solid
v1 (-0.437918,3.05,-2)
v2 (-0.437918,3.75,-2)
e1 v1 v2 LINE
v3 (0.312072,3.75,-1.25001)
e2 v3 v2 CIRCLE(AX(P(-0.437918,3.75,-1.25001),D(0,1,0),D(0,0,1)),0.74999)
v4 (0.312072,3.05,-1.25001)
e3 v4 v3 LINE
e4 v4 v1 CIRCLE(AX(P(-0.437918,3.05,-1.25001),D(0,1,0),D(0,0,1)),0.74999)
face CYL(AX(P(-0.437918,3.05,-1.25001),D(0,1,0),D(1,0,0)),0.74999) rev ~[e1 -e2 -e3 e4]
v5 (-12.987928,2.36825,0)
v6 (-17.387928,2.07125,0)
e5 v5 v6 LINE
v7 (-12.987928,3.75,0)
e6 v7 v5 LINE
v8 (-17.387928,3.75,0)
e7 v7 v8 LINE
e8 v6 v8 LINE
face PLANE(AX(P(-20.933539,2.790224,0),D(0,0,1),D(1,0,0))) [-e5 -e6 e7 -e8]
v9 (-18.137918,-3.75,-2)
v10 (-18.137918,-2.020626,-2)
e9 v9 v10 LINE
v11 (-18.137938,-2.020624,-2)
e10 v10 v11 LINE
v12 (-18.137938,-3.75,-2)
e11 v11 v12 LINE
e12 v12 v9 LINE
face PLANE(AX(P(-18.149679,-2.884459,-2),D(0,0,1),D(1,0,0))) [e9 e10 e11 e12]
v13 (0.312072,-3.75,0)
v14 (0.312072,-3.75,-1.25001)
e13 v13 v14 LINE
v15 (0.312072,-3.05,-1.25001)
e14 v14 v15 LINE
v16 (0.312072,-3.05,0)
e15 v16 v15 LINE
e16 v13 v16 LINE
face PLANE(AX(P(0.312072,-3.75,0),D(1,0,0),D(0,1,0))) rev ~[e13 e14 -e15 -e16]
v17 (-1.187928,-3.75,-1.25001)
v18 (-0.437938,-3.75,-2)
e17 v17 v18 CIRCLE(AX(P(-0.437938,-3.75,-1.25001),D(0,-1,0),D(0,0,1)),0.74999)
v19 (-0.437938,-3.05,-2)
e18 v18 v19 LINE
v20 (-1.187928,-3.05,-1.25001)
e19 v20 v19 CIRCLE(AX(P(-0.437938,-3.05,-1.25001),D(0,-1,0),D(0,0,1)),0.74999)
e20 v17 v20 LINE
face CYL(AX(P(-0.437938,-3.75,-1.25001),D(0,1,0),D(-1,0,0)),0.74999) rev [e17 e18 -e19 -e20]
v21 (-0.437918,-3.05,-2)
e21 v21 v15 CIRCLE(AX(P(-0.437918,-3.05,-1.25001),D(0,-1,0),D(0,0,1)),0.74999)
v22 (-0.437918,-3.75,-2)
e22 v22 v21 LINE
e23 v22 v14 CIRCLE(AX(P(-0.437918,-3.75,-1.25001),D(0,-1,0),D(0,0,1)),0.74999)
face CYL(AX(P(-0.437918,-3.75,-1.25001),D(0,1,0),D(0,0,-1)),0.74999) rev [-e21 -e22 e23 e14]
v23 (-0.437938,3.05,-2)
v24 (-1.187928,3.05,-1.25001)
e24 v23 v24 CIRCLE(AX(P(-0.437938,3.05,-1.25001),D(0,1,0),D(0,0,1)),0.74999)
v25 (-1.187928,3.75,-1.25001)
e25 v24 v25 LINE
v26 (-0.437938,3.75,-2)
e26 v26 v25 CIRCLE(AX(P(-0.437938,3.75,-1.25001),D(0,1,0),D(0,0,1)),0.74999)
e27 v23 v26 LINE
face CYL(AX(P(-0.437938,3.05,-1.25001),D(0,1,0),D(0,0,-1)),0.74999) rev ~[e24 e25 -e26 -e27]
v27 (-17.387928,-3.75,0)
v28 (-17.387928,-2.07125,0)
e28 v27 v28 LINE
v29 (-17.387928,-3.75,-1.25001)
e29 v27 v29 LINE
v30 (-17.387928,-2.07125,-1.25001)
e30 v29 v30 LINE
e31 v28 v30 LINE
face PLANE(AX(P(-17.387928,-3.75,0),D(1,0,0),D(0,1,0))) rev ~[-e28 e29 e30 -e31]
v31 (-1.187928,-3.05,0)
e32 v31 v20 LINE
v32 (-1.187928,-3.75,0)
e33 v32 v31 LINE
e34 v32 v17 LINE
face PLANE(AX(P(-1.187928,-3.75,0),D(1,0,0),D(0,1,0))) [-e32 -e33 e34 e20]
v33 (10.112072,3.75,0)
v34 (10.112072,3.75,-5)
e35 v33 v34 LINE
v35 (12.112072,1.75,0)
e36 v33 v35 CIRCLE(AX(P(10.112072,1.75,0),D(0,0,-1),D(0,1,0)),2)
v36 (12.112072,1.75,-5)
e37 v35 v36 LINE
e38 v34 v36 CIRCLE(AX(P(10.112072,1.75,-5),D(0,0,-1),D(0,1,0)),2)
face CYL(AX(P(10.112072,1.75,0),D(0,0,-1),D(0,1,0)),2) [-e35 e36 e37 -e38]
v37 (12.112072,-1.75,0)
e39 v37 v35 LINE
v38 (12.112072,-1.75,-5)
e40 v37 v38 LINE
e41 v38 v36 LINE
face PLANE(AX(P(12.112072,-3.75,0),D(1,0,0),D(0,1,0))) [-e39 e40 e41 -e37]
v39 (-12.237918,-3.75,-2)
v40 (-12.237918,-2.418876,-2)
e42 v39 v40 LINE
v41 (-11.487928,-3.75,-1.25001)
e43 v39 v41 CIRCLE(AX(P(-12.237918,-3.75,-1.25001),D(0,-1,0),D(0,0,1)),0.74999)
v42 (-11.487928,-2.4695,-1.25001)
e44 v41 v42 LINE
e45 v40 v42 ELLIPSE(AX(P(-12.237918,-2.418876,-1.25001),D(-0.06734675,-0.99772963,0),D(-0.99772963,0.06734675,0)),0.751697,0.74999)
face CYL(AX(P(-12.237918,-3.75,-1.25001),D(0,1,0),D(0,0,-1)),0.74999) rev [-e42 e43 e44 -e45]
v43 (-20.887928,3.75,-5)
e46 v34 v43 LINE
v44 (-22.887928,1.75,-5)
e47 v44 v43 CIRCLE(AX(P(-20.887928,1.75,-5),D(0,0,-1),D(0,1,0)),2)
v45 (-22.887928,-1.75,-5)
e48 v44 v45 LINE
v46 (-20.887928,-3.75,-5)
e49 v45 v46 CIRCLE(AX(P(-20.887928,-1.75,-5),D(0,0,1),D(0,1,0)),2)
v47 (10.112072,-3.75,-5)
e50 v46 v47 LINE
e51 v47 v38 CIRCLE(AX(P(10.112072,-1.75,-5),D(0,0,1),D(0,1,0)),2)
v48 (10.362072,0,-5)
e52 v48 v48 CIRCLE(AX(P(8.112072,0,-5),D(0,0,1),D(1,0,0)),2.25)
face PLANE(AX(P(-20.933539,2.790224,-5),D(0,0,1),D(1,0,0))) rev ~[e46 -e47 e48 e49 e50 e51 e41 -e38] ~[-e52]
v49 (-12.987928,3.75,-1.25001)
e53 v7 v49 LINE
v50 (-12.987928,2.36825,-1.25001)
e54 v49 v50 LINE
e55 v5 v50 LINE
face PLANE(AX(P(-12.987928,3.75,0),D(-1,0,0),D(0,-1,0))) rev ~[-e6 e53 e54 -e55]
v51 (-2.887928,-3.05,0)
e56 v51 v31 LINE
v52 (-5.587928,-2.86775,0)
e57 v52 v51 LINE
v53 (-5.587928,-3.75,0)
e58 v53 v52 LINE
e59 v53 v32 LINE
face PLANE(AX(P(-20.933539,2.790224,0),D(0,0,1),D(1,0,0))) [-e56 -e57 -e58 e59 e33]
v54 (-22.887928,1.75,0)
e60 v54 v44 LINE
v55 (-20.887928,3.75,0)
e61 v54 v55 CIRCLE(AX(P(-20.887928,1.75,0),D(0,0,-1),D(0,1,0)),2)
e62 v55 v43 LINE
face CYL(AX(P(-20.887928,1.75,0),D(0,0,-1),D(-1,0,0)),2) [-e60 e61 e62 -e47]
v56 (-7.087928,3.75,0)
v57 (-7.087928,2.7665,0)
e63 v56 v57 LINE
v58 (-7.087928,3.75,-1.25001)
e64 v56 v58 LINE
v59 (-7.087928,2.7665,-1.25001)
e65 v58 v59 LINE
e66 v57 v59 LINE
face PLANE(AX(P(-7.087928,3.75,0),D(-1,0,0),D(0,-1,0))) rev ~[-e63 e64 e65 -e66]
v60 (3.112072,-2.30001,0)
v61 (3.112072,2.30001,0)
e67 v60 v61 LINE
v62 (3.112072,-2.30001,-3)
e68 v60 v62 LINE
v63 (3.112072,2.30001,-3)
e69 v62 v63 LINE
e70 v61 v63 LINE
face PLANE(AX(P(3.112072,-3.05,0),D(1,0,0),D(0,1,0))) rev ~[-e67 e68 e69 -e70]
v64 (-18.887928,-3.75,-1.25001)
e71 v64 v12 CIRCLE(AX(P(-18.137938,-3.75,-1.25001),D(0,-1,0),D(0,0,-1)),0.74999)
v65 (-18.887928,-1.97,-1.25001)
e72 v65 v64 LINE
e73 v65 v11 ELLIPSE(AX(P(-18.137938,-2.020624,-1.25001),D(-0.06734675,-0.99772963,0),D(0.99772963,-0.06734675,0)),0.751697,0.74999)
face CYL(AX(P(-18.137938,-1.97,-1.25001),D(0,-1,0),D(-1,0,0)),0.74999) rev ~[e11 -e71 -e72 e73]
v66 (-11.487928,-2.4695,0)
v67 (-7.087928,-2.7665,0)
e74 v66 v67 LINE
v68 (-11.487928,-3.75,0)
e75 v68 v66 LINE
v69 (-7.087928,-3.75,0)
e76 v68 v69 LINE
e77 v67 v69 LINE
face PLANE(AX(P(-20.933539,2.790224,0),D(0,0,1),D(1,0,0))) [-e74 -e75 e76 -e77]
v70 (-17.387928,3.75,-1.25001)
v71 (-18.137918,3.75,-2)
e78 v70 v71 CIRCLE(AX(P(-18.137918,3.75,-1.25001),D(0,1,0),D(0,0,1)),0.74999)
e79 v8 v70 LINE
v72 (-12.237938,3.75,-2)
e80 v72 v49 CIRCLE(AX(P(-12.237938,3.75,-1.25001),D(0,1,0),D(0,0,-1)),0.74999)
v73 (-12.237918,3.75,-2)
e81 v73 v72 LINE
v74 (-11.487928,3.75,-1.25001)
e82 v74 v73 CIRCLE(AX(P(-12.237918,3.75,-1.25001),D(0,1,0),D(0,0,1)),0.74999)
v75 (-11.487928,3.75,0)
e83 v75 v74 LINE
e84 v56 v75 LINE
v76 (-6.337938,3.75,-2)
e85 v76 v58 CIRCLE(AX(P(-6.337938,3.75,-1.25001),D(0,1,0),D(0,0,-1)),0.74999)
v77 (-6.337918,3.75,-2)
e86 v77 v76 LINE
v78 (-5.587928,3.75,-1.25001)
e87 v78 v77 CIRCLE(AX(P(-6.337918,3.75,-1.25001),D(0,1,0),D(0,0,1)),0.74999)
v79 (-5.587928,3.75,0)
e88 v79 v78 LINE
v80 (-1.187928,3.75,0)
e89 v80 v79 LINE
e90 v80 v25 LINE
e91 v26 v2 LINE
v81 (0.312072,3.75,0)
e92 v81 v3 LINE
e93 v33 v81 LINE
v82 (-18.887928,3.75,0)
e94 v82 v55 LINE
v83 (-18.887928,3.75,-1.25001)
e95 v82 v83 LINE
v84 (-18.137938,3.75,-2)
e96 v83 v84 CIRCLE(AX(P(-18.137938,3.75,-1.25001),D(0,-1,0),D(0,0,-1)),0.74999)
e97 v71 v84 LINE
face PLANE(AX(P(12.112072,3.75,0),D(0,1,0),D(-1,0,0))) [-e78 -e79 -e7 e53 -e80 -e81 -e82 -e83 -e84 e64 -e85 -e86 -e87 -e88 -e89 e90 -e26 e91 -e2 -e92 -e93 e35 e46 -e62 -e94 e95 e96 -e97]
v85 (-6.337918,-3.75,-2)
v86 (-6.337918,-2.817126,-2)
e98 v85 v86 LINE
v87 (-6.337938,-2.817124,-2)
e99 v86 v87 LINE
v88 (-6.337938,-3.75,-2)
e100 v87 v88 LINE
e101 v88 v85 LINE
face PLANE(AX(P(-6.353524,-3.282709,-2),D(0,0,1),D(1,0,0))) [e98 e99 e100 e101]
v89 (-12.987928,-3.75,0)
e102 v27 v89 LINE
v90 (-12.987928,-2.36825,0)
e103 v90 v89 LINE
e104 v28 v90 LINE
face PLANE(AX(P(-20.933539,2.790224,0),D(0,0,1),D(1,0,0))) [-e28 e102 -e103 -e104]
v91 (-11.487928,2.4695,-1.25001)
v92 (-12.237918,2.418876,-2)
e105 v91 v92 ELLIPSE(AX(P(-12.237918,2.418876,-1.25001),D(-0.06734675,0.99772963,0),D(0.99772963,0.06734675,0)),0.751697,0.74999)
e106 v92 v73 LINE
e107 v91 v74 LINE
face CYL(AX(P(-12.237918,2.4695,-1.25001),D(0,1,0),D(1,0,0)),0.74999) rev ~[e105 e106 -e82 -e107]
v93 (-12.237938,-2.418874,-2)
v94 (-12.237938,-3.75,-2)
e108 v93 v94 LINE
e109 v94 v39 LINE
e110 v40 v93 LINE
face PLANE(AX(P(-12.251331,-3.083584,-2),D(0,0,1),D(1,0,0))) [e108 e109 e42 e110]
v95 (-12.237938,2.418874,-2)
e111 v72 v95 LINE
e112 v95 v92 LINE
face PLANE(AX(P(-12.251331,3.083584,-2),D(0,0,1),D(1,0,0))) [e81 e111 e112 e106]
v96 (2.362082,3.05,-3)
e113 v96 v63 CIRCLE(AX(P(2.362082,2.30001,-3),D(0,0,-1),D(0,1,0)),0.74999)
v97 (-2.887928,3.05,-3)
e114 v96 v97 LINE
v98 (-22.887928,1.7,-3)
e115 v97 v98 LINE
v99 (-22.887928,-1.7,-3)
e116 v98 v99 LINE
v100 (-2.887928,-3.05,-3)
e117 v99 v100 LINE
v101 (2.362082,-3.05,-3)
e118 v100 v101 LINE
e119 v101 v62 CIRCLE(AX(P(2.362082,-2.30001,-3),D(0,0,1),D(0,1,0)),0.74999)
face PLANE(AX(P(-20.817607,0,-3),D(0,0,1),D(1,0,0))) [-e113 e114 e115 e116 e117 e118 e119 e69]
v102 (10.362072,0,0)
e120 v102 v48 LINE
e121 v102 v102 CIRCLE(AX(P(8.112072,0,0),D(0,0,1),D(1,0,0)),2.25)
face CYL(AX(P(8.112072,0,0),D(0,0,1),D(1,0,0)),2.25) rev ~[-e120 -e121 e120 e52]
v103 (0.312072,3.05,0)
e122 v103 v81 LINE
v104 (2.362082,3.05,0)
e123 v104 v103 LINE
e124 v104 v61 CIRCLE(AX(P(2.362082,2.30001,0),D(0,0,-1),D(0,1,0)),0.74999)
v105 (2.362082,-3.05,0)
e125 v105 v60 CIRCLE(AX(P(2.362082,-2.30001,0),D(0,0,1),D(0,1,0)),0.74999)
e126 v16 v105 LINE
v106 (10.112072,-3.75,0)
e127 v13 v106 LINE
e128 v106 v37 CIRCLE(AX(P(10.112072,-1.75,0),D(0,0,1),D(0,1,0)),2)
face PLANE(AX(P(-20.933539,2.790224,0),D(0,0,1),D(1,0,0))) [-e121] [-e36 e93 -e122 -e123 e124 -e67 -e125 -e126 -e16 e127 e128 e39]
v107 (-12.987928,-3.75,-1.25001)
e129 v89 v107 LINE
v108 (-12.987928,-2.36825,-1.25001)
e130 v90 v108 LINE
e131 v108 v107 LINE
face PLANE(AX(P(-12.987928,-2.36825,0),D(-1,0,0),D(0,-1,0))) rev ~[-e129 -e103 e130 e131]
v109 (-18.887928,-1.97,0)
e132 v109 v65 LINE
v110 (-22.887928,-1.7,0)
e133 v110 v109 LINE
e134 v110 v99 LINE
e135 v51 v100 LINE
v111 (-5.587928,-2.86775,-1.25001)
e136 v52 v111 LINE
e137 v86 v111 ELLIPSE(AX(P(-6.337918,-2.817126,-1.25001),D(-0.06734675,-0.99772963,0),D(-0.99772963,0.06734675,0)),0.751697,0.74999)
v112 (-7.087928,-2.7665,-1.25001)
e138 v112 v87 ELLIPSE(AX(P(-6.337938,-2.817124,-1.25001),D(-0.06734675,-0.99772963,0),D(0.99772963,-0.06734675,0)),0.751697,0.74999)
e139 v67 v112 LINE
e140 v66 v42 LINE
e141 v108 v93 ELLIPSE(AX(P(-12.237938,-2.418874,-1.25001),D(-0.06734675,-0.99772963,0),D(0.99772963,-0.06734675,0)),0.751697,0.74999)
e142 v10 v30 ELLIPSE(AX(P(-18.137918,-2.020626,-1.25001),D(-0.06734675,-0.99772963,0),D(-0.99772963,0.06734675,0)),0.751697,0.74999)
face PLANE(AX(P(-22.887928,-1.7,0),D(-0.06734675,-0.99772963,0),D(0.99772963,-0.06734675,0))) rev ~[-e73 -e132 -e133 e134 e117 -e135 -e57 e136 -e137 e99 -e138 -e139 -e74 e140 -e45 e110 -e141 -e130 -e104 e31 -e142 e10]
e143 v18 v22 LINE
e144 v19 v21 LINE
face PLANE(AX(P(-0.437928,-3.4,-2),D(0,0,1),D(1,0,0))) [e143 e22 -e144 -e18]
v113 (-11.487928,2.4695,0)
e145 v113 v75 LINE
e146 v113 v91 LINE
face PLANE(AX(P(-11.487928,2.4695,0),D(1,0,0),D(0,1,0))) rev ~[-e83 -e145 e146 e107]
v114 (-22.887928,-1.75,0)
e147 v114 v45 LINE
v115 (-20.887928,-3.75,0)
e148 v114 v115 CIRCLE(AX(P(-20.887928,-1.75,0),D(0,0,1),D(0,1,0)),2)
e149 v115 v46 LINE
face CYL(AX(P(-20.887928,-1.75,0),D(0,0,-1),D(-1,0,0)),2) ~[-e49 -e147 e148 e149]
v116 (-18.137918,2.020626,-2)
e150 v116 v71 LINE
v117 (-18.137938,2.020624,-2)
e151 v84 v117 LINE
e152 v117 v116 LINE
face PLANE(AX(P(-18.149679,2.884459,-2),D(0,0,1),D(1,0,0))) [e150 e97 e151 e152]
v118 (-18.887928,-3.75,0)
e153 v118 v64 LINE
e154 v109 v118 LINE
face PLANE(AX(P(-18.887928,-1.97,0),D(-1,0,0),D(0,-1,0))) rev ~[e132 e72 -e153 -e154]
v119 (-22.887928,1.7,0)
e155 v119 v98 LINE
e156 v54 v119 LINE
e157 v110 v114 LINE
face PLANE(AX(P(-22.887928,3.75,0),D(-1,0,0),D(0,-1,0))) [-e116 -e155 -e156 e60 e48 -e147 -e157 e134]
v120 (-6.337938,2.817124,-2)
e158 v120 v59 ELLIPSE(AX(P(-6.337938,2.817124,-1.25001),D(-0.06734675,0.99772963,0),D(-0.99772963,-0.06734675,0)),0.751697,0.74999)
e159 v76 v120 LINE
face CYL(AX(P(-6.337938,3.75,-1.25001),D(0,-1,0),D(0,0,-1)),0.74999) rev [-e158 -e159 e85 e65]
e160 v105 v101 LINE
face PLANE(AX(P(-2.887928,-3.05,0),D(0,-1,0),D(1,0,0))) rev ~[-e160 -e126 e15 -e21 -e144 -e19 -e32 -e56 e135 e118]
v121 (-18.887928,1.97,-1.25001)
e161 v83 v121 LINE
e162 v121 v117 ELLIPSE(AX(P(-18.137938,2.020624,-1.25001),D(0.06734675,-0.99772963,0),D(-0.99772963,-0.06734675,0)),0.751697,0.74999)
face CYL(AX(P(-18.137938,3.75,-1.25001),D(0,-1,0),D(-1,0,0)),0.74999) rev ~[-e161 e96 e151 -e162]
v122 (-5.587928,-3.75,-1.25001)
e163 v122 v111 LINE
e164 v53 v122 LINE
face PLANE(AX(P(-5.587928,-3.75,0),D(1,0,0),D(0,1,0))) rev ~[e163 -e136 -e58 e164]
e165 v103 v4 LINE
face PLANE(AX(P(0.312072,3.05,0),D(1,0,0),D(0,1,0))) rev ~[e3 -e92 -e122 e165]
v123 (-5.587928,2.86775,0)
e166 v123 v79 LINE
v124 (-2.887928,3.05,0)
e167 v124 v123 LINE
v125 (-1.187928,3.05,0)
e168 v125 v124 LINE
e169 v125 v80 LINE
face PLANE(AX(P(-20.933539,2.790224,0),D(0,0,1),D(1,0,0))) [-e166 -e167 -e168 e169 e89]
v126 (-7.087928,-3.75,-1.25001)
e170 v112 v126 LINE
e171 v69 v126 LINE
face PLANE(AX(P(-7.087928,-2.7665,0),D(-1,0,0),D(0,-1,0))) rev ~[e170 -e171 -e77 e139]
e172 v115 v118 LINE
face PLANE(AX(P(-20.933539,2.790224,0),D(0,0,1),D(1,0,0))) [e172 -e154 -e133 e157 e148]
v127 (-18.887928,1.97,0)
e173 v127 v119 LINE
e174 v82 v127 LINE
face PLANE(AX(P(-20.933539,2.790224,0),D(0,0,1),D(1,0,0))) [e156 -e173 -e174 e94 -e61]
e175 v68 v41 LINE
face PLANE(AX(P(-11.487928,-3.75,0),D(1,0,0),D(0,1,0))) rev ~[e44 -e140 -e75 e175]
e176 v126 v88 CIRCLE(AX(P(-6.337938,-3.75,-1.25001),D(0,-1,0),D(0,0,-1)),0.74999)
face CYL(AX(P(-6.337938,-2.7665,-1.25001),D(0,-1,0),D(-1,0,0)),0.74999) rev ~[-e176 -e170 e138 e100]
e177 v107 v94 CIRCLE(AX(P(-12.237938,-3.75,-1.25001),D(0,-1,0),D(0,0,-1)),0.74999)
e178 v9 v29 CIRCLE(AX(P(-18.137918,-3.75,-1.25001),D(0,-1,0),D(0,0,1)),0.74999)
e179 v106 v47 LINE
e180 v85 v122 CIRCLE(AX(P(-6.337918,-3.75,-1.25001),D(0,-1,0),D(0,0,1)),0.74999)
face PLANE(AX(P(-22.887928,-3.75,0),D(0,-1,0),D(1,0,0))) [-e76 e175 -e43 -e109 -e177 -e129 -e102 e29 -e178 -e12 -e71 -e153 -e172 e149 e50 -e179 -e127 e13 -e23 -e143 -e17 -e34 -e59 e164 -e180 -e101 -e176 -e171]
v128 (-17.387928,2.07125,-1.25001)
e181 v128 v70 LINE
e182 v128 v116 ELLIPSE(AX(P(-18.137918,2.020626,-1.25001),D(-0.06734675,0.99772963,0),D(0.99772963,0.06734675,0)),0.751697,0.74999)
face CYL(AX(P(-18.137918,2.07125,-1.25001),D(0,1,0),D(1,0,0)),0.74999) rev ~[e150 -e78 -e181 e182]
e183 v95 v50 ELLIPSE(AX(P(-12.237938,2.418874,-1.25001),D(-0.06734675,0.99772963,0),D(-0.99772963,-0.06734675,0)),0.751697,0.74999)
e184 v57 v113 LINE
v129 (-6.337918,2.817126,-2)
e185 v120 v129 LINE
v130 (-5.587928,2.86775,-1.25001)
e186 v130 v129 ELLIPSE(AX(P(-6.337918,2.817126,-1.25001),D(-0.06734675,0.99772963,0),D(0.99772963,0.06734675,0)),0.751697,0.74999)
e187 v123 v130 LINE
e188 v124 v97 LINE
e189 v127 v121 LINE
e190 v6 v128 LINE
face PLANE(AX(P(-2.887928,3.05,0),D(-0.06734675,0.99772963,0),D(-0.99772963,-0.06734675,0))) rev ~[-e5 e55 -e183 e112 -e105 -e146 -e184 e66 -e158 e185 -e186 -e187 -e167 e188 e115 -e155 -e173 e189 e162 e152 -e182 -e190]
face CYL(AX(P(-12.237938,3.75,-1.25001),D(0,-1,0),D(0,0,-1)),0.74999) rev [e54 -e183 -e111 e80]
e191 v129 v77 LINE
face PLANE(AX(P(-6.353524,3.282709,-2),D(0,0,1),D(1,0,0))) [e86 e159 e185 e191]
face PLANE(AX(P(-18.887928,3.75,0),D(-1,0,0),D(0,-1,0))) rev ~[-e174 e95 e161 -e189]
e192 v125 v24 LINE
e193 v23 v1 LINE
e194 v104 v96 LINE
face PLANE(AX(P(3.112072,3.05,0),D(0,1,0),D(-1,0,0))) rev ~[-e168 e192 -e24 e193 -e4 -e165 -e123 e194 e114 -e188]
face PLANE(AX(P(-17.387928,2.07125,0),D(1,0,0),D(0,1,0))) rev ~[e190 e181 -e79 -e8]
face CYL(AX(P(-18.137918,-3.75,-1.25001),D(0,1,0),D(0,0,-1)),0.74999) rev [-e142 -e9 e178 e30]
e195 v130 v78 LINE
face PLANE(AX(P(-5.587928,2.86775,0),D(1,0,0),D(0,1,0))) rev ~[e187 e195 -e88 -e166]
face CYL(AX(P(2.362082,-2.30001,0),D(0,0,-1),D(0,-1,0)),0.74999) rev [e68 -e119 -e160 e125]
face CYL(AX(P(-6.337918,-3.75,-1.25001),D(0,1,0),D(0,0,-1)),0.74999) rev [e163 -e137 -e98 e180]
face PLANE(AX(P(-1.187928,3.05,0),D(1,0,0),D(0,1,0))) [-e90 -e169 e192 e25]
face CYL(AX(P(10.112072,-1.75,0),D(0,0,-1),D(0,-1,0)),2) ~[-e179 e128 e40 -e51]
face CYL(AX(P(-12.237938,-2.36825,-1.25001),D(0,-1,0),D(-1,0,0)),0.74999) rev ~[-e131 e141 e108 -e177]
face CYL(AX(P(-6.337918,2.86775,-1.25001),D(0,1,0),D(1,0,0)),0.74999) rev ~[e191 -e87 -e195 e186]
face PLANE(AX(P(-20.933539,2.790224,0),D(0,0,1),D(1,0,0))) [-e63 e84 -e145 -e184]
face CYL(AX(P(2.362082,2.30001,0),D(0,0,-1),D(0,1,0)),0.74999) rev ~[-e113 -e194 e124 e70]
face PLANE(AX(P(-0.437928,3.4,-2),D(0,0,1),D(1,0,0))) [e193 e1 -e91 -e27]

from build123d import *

# Parameters (mm, degrees)
F0_W     = 1.5
F0_H     = 0.7
F0_R     = 2.25
F0_H_2   = 6.1
F0_W_2   = 2.8
F1_DEPTH = 5
F2_DEPTH = 3
F3_DEPTH = 2
F4_R     = 0.74999
F5_R     = 2


# Not quite as in the source:
# - a fillet or chamfer is up to 0.001 mm smaller than in the source, because OpenCascade refuses the exact size


with BuildPart() as f1:
    # F0 (on Top) → F1 (new body)
    with BuildSketch(Plane.XY):
        Polygon((-18.8879279066, 3.75), (-22.8879279066, 3.75), (-22.8879279066, 1.7), (-18.8879279066, 1.97), align=None)
        Polygon((-17.3879279066, 3.75), (-18.8879279066, 3.75), (-18.8879279066, 1.97), (-17.3879279066, 2.07125), align=None)
        Polygon((-18.8879279066, 1.97), (-22.8879279066, 1.7), (-22.8879279066, -1.7), (-18.8879279066, -1.97), align=None)
        Polygon((-12.9879279066, 3.75), (-17.3879279066, 3.75), (-17.3879279066, 2.07125), (-12.9879279066, 2.36825), align=None)
        Polygon((-18.8879279066, -1.97), (-22.8879279066, -1.7), (-22.8879279066, -3.75), (-18.8879279066, -3.75), align=None)
        Polygon((-11.4879279066, 3.75), (-12.9879279066, 3.75), (-12.9879279066, 2.36825), (-11.4879279066, 2.4695), align=None)
        Polygon((-17.3879279066, -2.07125), (-18.8879279066, -1.97), (-18.8879279066, -3.75), (-17.3879279066, -3.75), align=None)
        Polygon((-7.0879279066, 3.75), (-11.4879279066, 3.75), (-11.4879279066, 2.4695), (-7.0879279066, 2.7665), align=None)
        Polygon((-12.9879279066, -2.36825), (-17.3879279066, -2.07125), (-17.3879279066, -3.75), (-12.9879279066, -3.75), align=None)
        Polygon((-5.5879279066, 3.75), (-7.0879279066, 3.75), (-7.0879279066, 2.7665), (-5.5879279066, 2.86775), align=None)
        Polygon((-11.4879279066, -2.4695), (-12.9879279066, -2.36825), (-12.9879279066, -3.75), (-11.4879279066, -3.75), align=None)
        Polygon((-1.1879279066, 3.75), (-5.5879279066, 3.75), (-5.5879279066, 2.86775), (-2.8879279066, 3.05), (-1.1879279066, 3.05), align=None)
        Polygon((-7.0879279066, -2.7665), (-11.4879279066, -2.4695), (-11.4879279066, -3.75), (-7.0879279066, -3.75), align=None)
        with Locations((-0.4379279066, 3.4)):
            Rectangle(F0_W, F0_H)
        Polygon((-5.5879279066, -2.86775), (-7.0879279066, -2.7665), (-7.0879279066, -3.75), (-5.5879279066, -3.75), align=None)
        Polygon((12.1120720934, 3.75), (0.3120720934, 3.75), (0.3120720934, 3.05), (3.1120720934, 3.05), (3.1120720934, -3.05), (0.3120720934, -3.05), (0.3120720934, -3.75), (12.1120720934, -3.75), align=None)
        with Locations((8.1120720934, 0)):
            Circle(F0_R, mode=Mode.SUBTRACT)
        Polygon((-2.8879279066, -3.05), (-5.5879279066, -2.86775), (-5.5879279066, -3.75), (-1.1879279066, -3.75), (-1.1879279066, -3.05), align=None)
        with Locations((-0.4379279066, -3.4)):
            Rectangle(F0_W, F0_H)
        with Locations((-0.4379279066, 0)):
            Rectangle(F0_W, F0_H_2)
        Polygon((-5.5879279066, 2.86775), (-7.0879279066, 2.7665), (-7.0879279066, -2.7665), (-5.5879279066, -2.86775), align=None)
        Polygon((-17.3879279066, 2.07125), (-18.8879279066, 1.97), (-18.8879279066, -1.97), (-17.3879279066, -2.07125), align=None)
        Polygon((-12.9879279066, 2.36825), (-17.3879279066, 2.07125), (-17.3879279066, -2.07125), (-12.9879279066, -2.36825), align=None)
        Polygon((-7.0879279066, 2.7665), (-11.4879279066, 2.4695), (-11.4879279066, -2.4695), (-7.0879279066, -2.7665), align=None)
        Polygon((-11.4879279066, 2.4695), (-12.9879279066, 2.36825), (-12.9879279066, -2.36825), (-11.4879279066, -2.4695), align=None)
        Polygon((-2.8879279066, 3.05), (-5.5879279066, 2.86775), (-5.5879279066, -2.86775), (-2.8879279066, -3.05), (-1.1879279066, -3.05), (-1.1879279066, 3.05), align=None)
        with Locations((1.7120720934, 0)):
            Rectangle(F0_W_2, F0_H_2)
    extrude(amount=-F1_DEPTH)

    # F0 (on Top) → F2 (cut)
    with BuildSketch(Plane.XY):
        Polygon((-18.8879279066, 1.97), (-22.8879279066, 1.7), (-22.8879279066, -1.7), (-18.8879279066, -1.97), align=None)
        Polygon((-17.3879279066, 2.07125), (-18.8879279066, 1.97), (-18.8879279066, -1.97), (-17.3879279066, -2.07125), align=None)
        Polygon((-12.9879279066, 2.36825), (-17.3879279066, 2.07125), (-17.3879279066, -2.07125), (-12.9879279066, -2.36825), align=None)
        Polygon((-11.4879279066, 2.4695), (-12.9879279066, 2.36825), (-12.9879279066, -2.36825), (-11.4879279066, -2.4695), align=None)
        Polygon((-7.0879279066, 2.7665), (-11.4879279066, 2.4695), (-11.4879279066, -2.4695), (-7.0879279066, -2.7665), align=None)
        Polygon((-5.5879279066, 2.86775), (-7.0879279066, 2.7665), (-7.0879279066, -2.7665), (-5.5879279066, -2.86775), align=None)
        Polygon((-2.8879279066, 3.05), (-5.5879279066, 2.86775), (-5.5879279066, -2.86775), (-2.8879279066, -3.05), (-1.1879279066, -3.05), (-1.1879279066, 3.05), align=None)
        with Locations((-0.4379279066, 0)):
            Rectangle(F0_W, F0_H_2)
        with Locations((1.7120720934, 0)):
            Rectangle(F0_W_2, F0_H_2)
    extrude(amount=-F2_DEPTH, mode=Mode.SUBTRACT)

    # F0 (on Top) → F3 (cut)
    with BuildSketch(Plane.XY):
        Polygon((-17.3879279066, 3.75), (-18.8879279066, 3.75), (-18.8879279066, 1.97), (-17.3879279066, 2.07125), align=None)
        Polygon((-11.4879279066, 3.75), (-12.9879279066, 3.75), (-12.9879279066, 2.36825), (-11.4879279066, 2.4695), align=None)
        Polygon((-5.5879279066, 3.75), (-7.0879279066, 3.75), (-7.0879279066, 2.7665), (-5.5879279066, 2.86775), align=None)
        with Locations((-0.4379279066, -3.4)):
            Rectangle(F0_W, F0_H)
        Polygon((-17.3879279066, -2.07125), (-18.8879279066, -1.97), (-18.8879279066, -3.75), (-17.3879279066, -3.75), align=None)
        Polygon((-11.4879279066, -2.4695), (-12.9879279066, -2.36825), (-12.9879279066, -3.75), (-11.4879279066, -3.75), align=None)
        Polygon((-5.5879279066, -2.86775), (-7.0879279066, -2.7665), (-7.0879279066, -3.75), (-5.5879279066, -3.75), align=None)
        with Locations((-0.4379279066, 3.4)):
            Rectangle(F0_W, F0_H)
    extrude(amount=-F3_DEPTH, mode=Mode.SUBTRACT)

    # F4 (radius 0.75 in the source; OpenCascade refuses exactly that, so slightly less here)
    f4_edges = [f1.edges().sort_by_distance(p)[0] for p in [
        (-17.387928, -2.910625, -2),
        (-11.487928, -3.10975, -2),
        (-5.587928, -3.308875, -2),
        (0.312072, -3.4, -2),
        (-18.887928, -2.86, -2),
        (-12.987928, -3.059125, -2),
        (-7.087928, -3.25825, -2),
        (-1.187928, -3.4, -2),
        (-18.887928, 2.86, -2),
        (-12.987928, 3.059125, -2),
        (-7.087928, 3.25825, -2),
        (-1.187928, 3.4, -2),
        (-17.387928, 2.910625, -2),
        (-11.487928, 3.10975, -2),
        (-5.587928, 3.308875, -2),
        (0.312072, 3.4, -2),
        (3.112072, 3.05, -1.5),
        (3.112072, -3.05, -1.5),
    ]]
    fillet(f4_edges, radius=F4_R)

    # F5
    f5_edges = [f1.edges().sort_by_distance(p)[0] for p in [
        (-22.887928, -3.75, -2.5),
        (-22.887928, 3.75, -2.5),
        (12.112072, -3.75, -2.5),
        (12.112072, 3.75, -2.5),
    ]]
    fillet(f5_edges, radius=F5_R)


solid = f1.part
